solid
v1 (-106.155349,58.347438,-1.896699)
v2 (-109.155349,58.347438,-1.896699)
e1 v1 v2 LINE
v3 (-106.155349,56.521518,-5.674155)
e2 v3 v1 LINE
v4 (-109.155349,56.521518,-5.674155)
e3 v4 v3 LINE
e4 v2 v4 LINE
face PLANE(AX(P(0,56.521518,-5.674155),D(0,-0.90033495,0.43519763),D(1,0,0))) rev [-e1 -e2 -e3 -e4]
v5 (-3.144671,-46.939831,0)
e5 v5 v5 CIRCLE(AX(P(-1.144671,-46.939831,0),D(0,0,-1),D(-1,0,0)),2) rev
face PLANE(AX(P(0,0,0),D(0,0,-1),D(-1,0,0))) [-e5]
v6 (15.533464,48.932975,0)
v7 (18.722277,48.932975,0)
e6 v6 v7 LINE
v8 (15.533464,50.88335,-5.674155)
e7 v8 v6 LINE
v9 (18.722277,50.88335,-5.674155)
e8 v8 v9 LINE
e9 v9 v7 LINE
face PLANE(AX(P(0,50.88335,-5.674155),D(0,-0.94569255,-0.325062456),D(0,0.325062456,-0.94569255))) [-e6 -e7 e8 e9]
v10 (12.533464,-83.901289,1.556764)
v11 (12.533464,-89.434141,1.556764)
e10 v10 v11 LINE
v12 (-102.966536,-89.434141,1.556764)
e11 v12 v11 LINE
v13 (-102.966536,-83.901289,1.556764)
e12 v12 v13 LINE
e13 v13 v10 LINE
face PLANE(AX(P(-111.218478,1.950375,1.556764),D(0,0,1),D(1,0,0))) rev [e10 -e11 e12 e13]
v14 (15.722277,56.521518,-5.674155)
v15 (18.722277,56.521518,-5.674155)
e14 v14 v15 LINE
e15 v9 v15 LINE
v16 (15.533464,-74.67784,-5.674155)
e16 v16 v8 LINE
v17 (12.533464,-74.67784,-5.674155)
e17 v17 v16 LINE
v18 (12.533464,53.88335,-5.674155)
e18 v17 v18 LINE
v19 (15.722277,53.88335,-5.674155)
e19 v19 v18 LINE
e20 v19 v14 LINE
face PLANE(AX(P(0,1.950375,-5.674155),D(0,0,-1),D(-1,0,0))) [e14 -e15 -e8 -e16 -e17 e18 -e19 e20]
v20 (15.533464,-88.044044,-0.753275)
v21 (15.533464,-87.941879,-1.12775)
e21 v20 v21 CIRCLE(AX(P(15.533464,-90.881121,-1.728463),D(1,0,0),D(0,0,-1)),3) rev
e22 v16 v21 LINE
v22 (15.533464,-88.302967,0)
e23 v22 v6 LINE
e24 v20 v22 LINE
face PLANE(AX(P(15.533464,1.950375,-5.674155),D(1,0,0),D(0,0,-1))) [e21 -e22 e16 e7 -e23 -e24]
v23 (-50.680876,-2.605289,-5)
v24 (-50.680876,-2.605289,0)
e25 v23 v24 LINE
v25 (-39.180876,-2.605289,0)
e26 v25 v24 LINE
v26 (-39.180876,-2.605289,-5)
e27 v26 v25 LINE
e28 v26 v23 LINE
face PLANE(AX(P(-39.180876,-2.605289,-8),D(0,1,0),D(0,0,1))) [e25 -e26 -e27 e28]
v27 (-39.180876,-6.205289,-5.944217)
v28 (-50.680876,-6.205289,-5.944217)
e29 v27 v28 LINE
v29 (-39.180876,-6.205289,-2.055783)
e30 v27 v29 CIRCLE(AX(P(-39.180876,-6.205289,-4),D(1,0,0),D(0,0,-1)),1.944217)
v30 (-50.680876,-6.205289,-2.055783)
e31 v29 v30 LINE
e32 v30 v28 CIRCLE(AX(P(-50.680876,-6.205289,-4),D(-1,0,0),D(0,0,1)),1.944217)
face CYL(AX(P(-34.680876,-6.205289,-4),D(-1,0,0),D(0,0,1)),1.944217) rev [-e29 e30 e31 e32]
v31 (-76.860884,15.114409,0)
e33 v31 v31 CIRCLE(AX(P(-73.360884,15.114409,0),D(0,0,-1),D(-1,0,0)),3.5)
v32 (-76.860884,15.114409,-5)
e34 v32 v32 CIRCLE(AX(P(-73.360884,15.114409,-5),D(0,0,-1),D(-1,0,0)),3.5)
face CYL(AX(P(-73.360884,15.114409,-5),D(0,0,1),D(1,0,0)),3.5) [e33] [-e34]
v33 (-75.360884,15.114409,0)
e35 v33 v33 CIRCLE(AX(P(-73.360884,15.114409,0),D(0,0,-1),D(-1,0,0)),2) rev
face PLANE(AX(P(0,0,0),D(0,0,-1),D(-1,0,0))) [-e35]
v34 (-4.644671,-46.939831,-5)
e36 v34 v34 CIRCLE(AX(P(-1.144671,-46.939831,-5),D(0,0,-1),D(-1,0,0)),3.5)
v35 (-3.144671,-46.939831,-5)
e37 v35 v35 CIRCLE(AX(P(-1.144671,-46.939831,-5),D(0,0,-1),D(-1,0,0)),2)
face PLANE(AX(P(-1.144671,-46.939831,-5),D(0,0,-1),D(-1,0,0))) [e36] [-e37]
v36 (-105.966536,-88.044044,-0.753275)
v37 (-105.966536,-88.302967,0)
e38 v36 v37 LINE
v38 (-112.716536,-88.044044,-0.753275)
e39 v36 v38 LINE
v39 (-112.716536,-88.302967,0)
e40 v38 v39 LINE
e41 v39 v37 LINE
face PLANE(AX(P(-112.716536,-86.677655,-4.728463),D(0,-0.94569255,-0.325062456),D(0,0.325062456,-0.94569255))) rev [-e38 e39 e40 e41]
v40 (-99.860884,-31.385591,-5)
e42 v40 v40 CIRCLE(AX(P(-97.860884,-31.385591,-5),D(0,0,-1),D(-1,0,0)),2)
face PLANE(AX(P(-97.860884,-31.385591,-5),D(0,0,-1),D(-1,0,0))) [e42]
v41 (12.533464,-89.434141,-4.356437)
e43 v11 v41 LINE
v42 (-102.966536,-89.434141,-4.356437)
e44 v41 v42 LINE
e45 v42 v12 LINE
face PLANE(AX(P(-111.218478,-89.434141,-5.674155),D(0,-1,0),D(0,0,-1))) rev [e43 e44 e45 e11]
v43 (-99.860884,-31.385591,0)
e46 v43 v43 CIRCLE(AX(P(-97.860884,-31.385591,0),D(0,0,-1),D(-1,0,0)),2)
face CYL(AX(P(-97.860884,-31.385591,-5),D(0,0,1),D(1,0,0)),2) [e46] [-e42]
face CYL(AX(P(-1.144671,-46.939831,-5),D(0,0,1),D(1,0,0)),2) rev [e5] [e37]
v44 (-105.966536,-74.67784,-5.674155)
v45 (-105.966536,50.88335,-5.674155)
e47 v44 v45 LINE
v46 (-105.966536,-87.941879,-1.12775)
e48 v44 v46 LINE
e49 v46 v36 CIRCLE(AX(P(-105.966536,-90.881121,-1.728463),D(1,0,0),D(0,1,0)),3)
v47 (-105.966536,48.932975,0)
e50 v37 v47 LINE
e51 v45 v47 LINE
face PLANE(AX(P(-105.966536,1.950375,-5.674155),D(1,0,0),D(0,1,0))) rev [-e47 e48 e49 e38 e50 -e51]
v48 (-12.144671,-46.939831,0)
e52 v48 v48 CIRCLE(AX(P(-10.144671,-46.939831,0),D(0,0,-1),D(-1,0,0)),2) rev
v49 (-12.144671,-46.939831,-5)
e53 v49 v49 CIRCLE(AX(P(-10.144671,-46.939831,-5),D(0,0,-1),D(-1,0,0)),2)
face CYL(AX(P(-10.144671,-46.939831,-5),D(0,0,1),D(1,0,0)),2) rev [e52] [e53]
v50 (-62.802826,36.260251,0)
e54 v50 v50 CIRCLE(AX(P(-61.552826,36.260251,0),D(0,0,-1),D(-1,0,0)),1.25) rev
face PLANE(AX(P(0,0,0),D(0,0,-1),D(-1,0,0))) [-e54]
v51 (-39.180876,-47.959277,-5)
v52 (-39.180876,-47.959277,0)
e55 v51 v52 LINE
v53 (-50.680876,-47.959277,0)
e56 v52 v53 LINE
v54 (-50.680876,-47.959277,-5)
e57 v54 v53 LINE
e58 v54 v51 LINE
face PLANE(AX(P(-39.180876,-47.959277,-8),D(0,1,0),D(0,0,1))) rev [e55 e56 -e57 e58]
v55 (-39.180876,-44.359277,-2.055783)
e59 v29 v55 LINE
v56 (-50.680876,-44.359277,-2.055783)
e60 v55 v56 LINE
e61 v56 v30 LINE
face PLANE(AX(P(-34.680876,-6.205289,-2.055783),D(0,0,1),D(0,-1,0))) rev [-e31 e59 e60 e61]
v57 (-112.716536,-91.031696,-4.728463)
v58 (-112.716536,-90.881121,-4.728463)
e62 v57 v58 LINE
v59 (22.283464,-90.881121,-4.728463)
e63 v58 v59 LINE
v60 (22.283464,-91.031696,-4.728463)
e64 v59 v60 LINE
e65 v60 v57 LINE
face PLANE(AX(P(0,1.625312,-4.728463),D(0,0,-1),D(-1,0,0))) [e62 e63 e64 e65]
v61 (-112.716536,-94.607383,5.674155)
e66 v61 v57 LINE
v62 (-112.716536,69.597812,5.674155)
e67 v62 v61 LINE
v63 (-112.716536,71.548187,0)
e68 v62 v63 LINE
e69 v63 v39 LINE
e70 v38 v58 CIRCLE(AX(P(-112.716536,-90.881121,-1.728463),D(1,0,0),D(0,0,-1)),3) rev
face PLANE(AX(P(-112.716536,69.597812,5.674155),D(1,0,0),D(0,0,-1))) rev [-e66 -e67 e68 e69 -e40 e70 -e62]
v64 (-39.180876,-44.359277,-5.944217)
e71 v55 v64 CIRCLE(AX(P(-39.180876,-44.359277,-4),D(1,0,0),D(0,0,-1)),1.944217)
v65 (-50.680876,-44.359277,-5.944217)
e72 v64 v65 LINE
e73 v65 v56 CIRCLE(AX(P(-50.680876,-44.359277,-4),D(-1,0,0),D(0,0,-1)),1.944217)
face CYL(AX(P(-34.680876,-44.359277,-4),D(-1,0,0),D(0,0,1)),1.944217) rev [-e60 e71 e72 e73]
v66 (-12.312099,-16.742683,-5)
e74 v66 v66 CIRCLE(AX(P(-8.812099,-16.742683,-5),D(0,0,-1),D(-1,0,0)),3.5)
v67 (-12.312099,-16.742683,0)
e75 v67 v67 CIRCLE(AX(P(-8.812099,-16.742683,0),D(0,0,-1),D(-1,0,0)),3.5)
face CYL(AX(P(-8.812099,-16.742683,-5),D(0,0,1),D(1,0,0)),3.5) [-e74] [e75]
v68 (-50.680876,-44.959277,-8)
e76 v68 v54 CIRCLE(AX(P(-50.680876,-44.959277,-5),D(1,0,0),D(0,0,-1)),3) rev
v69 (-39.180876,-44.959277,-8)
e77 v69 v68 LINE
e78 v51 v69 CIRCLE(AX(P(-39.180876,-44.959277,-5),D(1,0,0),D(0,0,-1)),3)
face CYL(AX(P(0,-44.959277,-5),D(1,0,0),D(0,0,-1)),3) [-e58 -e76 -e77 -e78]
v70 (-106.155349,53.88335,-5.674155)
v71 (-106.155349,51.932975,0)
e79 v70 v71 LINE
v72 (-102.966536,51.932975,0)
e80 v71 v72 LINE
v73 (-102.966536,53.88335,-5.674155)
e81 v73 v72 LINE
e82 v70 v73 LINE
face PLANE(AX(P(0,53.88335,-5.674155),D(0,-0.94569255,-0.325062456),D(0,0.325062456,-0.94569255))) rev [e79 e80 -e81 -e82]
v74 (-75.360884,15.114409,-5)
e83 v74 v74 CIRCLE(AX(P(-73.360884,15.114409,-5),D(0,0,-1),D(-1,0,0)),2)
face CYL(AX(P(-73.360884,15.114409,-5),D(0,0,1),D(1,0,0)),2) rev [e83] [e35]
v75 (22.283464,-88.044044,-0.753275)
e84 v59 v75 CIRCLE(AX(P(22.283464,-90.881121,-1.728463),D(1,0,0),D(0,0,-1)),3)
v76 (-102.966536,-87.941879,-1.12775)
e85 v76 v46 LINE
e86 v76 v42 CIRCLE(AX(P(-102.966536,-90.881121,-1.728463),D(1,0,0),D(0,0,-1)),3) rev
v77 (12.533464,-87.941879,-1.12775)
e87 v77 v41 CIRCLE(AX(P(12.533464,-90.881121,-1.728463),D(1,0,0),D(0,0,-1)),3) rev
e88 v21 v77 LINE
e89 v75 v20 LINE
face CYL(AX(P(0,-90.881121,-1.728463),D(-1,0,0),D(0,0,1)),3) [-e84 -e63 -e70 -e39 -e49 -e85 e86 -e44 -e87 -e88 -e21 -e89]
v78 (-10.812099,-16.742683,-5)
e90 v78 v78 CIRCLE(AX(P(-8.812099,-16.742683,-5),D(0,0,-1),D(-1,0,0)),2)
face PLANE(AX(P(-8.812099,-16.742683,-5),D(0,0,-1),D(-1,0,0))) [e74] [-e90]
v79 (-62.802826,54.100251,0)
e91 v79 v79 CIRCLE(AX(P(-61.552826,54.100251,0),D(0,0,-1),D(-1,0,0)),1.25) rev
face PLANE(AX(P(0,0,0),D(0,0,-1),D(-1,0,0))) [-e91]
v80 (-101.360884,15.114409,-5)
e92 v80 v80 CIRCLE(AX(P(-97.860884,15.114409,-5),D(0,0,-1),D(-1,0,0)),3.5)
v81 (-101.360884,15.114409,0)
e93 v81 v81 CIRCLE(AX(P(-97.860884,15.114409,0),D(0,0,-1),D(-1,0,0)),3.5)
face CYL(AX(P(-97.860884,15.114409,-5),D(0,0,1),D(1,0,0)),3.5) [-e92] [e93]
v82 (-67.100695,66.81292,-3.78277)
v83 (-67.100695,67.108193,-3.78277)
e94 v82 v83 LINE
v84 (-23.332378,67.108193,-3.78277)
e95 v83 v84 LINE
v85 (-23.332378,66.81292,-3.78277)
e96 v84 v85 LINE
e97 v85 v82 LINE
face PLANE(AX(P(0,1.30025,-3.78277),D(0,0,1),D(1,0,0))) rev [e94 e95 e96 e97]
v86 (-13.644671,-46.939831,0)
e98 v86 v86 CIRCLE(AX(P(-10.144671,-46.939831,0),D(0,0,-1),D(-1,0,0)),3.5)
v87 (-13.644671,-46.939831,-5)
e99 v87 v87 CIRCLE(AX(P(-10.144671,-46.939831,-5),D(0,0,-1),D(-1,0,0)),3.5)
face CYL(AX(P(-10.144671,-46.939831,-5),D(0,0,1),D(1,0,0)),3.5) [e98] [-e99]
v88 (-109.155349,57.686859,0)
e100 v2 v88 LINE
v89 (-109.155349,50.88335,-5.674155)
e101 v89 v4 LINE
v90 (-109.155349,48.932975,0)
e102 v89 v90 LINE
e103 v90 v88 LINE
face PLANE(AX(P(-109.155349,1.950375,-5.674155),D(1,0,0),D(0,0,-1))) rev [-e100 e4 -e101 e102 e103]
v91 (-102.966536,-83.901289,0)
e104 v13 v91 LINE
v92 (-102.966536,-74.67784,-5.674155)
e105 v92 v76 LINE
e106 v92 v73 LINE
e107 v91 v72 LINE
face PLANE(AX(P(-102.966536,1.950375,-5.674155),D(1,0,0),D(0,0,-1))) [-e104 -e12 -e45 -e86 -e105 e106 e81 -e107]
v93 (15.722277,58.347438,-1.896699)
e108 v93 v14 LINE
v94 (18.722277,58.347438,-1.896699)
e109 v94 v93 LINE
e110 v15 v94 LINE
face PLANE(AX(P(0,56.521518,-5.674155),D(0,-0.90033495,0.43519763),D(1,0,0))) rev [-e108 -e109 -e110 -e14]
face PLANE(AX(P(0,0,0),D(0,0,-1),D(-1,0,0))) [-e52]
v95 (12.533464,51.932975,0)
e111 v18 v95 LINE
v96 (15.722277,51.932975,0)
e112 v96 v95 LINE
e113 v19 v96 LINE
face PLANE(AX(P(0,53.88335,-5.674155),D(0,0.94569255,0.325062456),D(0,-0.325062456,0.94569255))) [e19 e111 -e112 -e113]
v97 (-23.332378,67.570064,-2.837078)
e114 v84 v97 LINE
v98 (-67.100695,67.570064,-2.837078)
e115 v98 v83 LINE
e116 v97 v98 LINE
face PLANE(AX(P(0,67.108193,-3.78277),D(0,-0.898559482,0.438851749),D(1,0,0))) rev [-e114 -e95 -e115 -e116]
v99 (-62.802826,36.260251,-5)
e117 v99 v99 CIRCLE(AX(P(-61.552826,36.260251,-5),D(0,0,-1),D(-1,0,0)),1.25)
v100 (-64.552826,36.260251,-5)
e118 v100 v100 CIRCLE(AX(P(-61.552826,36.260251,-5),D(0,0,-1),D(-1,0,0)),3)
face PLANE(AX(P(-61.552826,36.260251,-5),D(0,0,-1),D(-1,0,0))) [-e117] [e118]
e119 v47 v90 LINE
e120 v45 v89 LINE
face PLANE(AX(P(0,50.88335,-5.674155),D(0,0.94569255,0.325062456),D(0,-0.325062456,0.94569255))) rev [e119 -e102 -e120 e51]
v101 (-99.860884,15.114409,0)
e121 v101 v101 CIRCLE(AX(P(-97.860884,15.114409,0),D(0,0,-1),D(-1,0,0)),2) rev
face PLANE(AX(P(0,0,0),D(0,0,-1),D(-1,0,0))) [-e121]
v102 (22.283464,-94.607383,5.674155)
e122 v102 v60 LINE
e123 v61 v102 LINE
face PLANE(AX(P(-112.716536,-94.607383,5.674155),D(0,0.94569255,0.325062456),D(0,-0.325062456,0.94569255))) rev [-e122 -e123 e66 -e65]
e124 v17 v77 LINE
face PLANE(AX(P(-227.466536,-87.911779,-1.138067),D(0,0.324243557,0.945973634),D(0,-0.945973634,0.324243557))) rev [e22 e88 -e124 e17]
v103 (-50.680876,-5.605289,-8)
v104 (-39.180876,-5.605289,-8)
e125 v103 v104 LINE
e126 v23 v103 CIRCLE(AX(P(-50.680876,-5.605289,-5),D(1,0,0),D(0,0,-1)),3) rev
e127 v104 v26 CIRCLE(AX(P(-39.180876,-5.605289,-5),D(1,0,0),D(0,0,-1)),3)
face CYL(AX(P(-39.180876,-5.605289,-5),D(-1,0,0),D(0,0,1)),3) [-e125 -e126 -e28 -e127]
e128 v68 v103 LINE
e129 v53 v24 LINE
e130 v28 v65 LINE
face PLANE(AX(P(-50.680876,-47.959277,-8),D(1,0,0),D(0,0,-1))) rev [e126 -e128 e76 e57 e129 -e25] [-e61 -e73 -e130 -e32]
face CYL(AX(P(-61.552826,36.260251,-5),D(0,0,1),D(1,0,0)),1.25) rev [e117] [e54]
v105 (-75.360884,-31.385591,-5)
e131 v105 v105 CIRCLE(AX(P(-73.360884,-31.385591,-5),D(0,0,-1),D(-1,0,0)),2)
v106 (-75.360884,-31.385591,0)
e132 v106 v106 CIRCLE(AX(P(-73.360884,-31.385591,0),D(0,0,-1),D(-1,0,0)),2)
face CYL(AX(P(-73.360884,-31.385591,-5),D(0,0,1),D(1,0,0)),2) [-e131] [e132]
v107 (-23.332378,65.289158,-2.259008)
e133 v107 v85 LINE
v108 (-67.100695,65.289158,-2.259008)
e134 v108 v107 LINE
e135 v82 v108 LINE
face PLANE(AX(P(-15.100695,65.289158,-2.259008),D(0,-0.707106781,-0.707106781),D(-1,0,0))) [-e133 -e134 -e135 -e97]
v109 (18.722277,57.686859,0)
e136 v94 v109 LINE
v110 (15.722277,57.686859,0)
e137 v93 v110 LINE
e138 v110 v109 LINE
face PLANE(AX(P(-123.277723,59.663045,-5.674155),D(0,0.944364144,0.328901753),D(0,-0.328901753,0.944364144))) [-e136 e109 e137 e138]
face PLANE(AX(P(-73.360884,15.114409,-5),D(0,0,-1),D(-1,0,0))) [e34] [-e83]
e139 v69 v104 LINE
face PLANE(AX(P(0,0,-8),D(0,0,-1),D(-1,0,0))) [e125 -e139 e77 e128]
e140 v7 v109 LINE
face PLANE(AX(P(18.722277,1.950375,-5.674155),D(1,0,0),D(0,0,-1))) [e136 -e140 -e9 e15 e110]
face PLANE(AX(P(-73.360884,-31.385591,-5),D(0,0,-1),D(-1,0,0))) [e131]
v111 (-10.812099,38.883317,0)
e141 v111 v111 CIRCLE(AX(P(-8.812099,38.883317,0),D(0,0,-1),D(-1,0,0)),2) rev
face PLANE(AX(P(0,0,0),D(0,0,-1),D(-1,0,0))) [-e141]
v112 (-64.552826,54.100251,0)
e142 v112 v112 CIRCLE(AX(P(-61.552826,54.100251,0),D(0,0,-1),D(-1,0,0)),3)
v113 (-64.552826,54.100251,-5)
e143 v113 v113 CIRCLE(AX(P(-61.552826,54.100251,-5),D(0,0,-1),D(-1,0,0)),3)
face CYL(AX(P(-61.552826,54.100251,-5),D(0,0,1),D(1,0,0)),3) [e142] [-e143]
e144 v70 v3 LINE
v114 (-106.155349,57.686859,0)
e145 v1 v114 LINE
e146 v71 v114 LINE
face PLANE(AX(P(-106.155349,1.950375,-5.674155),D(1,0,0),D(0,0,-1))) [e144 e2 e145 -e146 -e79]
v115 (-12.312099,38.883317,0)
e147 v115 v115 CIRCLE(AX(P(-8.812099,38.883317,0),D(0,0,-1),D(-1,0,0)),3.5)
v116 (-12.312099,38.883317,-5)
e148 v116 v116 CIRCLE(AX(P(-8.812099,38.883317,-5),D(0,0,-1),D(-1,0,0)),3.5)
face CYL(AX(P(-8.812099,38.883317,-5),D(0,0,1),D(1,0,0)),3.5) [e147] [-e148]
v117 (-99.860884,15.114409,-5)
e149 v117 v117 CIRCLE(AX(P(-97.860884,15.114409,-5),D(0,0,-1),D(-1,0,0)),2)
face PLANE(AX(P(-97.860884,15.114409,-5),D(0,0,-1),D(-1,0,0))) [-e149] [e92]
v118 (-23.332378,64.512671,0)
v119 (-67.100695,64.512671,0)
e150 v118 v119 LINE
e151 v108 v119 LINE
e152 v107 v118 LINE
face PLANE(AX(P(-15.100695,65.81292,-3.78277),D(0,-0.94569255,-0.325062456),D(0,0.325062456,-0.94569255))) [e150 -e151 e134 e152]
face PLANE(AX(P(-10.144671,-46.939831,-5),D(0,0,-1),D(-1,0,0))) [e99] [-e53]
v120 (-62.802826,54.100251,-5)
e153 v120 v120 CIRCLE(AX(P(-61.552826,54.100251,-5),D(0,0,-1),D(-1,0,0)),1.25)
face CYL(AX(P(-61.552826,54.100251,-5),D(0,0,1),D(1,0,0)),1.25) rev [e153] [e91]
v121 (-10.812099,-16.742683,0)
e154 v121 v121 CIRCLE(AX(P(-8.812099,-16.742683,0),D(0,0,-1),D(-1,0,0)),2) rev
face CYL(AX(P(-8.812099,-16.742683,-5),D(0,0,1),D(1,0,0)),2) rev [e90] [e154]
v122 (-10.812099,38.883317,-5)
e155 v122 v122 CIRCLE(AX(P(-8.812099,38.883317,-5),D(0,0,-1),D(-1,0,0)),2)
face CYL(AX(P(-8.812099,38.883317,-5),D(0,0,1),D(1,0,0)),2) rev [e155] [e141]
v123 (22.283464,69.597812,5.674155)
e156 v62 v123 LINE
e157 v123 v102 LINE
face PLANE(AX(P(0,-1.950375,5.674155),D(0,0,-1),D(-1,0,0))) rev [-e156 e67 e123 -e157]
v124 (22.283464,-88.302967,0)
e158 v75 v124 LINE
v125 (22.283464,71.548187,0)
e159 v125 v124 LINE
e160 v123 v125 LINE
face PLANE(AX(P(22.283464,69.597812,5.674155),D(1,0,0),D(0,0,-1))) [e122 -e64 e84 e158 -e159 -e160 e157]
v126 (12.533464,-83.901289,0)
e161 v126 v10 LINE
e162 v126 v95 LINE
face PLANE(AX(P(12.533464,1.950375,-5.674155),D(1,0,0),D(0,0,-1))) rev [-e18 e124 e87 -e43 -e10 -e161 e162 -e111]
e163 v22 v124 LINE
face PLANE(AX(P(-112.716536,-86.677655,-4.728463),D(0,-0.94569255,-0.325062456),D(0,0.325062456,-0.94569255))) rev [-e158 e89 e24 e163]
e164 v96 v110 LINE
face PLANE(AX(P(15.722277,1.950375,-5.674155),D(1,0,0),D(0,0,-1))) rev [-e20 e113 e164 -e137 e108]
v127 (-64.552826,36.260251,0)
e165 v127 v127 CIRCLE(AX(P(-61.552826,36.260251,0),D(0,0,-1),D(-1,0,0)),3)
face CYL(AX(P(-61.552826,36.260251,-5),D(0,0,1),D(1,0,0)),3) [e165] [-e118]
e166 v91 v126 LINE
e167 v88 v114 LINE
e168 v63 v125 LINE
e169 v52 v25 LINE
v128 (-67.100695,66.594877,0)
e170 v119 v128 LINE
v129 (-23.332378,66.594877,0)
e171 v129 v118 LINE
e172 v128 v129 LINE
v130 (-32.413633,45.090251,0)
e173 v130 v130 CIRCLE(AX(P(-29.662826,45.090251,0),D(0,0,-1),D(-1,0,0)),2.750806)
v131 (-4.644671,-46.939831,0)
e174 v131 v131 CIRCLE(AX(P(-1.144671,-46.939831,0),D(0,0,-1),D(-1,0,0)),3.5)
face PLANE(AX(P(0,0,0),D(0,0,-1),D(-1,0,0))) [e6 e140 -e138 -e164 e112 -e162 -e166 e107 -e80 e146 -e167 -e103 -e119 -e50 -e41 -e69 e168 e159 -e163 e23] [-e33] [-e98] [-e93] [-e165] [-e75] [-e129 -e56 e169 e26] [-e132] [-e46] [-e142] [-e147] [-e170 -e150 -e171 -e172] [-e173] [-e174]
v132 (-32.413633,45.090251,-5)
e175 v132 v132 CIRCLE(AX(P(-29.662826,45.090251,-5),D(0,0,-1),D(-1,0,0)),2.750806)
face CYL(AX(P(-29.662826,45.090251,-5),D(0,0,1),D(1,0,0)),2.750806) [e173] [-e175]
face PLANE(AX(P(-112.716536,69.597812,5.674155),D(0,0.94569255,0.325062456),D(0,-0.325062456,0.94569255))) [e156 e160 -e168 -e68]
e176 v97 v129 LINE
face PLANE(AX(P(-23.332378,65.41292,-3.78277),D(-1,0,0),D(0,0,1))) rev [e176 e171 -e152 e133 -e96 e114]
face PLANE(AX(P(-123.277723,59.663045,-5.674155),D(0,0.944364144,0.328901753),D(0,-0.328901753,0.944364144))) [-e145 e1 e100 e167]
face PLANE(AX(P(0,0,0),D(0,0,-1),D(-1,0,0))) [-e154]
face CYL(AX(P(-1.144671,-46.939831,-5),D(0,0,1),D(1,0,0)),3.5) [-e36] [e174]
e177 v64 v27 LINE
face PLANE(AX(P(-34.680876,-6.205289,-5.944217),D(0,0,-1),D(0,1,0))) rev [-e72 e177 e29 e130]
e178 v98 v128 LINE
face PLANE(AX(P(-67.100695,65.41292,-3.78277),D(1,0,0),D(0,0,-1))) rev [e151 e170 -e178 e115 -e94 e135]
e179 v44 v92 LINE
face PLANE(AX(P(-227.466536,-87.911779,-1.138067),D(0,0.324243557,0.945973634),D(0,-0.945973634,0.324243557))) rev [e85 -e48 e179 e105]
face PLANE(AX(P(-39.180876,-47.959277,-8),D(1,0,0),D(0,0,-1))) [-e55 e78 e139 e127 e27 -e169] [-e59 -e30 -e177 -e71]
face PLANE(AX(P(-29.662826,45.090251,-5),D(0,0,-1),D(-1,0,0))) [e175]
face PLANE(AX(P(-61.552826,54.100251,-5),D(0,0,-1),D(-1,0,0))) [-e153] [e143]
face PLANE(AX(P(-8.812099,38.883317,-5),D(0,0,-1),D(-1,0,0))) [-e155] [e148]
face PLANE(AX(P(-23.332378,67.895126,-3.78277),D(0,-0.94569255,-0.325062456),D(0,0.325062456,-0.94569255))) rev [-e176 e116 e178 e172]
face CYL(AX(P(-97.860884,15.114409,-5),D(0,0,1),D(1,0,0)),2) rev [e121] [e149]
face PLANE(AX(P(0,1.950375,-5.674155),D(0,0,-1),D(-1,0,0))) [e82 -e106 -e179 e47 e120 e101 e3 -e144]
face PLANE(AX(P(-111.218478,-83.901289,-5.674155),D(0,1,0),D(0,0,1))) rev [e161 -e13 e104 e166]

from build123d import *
from OCP.BRepFilletAPI import BRepFilletAPI_MakeChamfer

# Parameters (mm, degrees)
SALIENTE_EXTRUIR1_START   = -112.716536218
SALIENTE_EXTRUIR1_DEPTH   = 135
SALIENTE_EXTRUIR2_START   = -105.966536218
SALIENTE_EXTRUIR2_DEPTH   = 3
SALIENTE_EXTRUIR2_START_2 = 12.533463782
SALIENTE_EXTRUIR2_2_DEPTH = 3
SALIENTE_EXTRUIR2_START_3 = -102.966536218
SALIENTE_EXTRUIR2_3_DEPTH = 115.5
SALIENTE_EXTRUIR2_START_4 = -109.155348963
SALIENTE_EXTRUIR2_4_DEPTH = 3
SALIENTE_EXTRUIR2_START_5 = 15.722276527
SALIENTE_EXTRUIR2_5_DEPTH = 3
SALIENTE_EXTRUIR2_START_6 = -106.155348963
SALIENTE_EXTRUIR2_6_DEPTH = 0.188812745
SALIENTE_EXTRUIR2_START_7 = 15.533463782
SALIENTE_EXTRUIR2_7_DEPTH = 0.188812745
CORTAR_EXTRUIR1_DEPTH     = 142
SALIENTE_EXTRUIR3_START   = -67.100694653
SALIENTE_EXTRUIR3_DEPTH   = 43.76831687
CORTAR_EXTRUIR2_DEPTH     = 52
CHAFL_N1_SIZE             = 1
CHAFL_N1_SIZE2            = 0.786933748
CHAFL_N2_SIZE             = 1
CHAFL_N2_SIZE2            = 1.611265726
CHAFL_N3_SIZE             = 4
CHAFL_N3_SIZE2            = 3.141527632
CORTAR_EXTRUIR3_DEPTH     = 243
CHAFL_N4_SIZE             = 2
CHAFL_N4_SIZE2            = 1.425175398
CROQUIS7_W                = 135
CROQUIS7_H                = 4.35404101
SALIENTE_EXTRUIR4_DEPTH   = 5
REDONDEO1_R               = 3
SALIENTE_EXTRUIR5_DEPTH   = 8
CORTAR_EXTRUIR4_DEPTH     = 16
REDONDEO2_R               = 3
CORTAR_EXTRUIR5_START     = -9.75
CORTAR_EXTRUIR5_DEPTH     = 115.5
CROQUIS11_R               = 3.5
CROQUIS11_R_2             = 2
CROQUIS11_R_3             = 3
CROQUIS11_R_4             = 1.25
CROQUIS11_R_5             = 2.750806456
SALIENTE_EXTRUIR6_DEPTH   = 5


# Read off the part's stored shape, not the designer's step: Saliente-Extruir1, Saliente-Extruir2, Saliente-Extruir3
with BuildPart() as part:
    # Saliente-Extruir1 outline → Saliente-Extruir1 (new body)
    with BuildSketch(Plane.YZ.offset(SALIENTE_EXTRUIR1_START)):
        Polygon((-94.607382532, 5.674155302), (-92.657007797, 0), (71.548186707, 0), (69.597811972, 5.674155302), align=None)
    extrude(amount=SALIENTE_EXTRUIR1_DEPTH)

    # Saliente-Extruir2 outline → Saliente-Extruir2 (add)
    with BuildSketch(Plane.YZ.offset(SALIENTE_EXTRUIR2_START)):
        Polygon((-88.302966787, 0), (-86.352592053, -5.674155302), (53.883350011, -5.674155302), (51.932975277, 0), align=None)
    extrude(amount=SALIENTE_EXTRUIR2_DEPTH)

    # Saliente-Extruir2 2 outline → Saliente-Extruir2 2 (add)
    with BuildSketch(Plane.YZ.offset(SALIENTE_EXTRUIR2_START_2)):
        Polygon((-88.302966787, 0), (-86.352592053, -5.674155302), (53.883350011, -5.674155302), (51.932975277, 0), align=None)
    extrude(amount=SALIENTE_EXTRUIR2_2_DEPTH)

    # Saliente-Extruir2 3 outline → Saliente-Extruir2 3 (add)
    with BuildSketch(Plane.YZ.offset(SALIENTE_EXTRUIR2_START_3)):
        Polygon((-85.302966787, 0), (-88.302966787, 0), (-86.352592053, -5.674155302), (-83.352592053, -5.674155302), align=None)
    extrude(amount=SALIENTE_EXTRUIR2_3_DEPTH)

    # Saliente-Extruir2 4 outline → Saliente-Extruir2 4 (add)
    with BuildSketch(Plane.YZ.offset(SALIENTE_EXTRUIR2_START_4)):
        Polygon((48.932975277, 0), (50.883350011, -5.674155302), (63.313045378, -5.674155302), (61.362670643, 0), align=None)
    extrude(amount=SALIENTE_EXTRUIR2_4_DEPTH)

    # Saliente-Extruir2 5 outline → Saliente-Extruir2 5 (add)
    with BuildSketch(Plane.YZ.offset(SALIENTE_EXTRUIR2_START_5)):
        Polygon((48.932975277, 0), (50.883350011, -5.674155302), (63.313045378, -5.674155302), (61.362670643, 0), align=None)
    extrude(amount=SALIENTE_EXTRUIR2_5_DEPTH)

    # Saliente-Extruir2 6 outline → Saliente-Extruir2 6 (add)
    with BuildSketch(Plane.YZ.offset(SALIENTE_EXTRUIR2_START_6)):
        Polygon((51.932975277, 0), (48.932975277, 0), (50.883350011, -5.674155302), (53.883350011, -5.674155302), align=None)
    extrude(amount=SALIENTE_EXTRUIR2_6_DEPTH)

    # Saliente-Extruir2 7 outline → Saliente-Extruir2 7 (add)
    with BuildSketch(Plane.YZ.offset(SALIENTE_EXTRUIR2_START_7)):
        Polygon((51.932975277, 0), (48.932975277, 0), (50.883350011, -5.674155302), (53.883350011, -5.674155302), align=None)
    extrude(amount=SALIENTE_EXTRUIR2_7_DEPTH)

    # Croquis3 → Cortar-Extruir1 (cut)
    with BuildSketch(Plane(origin=(18.722276527, 0, 0), x_dir=(0, 0, -1), z_dir=(1, 0, 0))):
        Polygon((5.674155302, 59.663045378), (0, 57.686858925), (0, 61.691536691), (6.106990738, 63.936404196), (5.897646794, 59.689197808), align=None)
    extrude(amount=-CORTAR_EXTRUIR1_DEPTH, mode=Mode.SUBTRACT)

    # Saliente-Extruir3 outline → Saliente-Extruir3 (add)
    with BuildSketch(Plane.YZ.offset(SALIENTE_EXTRUIR3_START)):
        Polygon((67.89512648, -3.782770202), (66.594876657, 0), (64.112670643, 0), (65.412920466, -3.782770202), align=None)
    extrude(amount=SALIENTE_EXTRUIR3_DEPTH)

    # Croquis5 → Cortar-Extruir2 (cut)
    with BuildSketch(Plane.ZY.offset(67.100694653)):
        Polygon((0, 64.112670643), (-3.782770202, 65.412920466), (-3.782770202, 65.812920466), (0, 64.512670643), align=None)
    extrude(amount=-CORTAR_EXTRUIR2_DEPTH, mode=Mode.SUBTRACT)

    # Chaflán1
    chafl_n1_edges = [part.edges().sort_by_distance(p)[0] for p in [
        (-45.216536218, 67.89512648, -3.782770202),
    ]]
    chafl_n1_side = [part.faces().sort_by_distance(p)[0] for p in [
        (-45.216536218, 67.245001569, -1.891385101),
    ]]
    chamfer(chafl_n1_edges, length=CHAFL_N1_SIZE, length2=CHAFL_N1_SIZE2, reference=chafl_n1_side[0])

    # Chaflán2
    chafl_n2_edges = [part.edges().sort_by_distance(p)[0] for p in [
        (-45.216536218, 65.812920466, -3.782770202),
    ]]
    chafl_n2_side = [part.faces().sort_by_distance(p)[0] for p in [
        (-45.216536218, 66.460556599, -3.782770202),
    ]]
    chamfer(chafl_n2_edges, length=CHAFL_N2_SIZE, length2=CHAFL_N2_SIZE2, reference=chafl_n2_side[0])

    # Chaflán3: one chamfer whose edges measure the first distance from different faces: ONE call of the kernel's chamfer builder (chamfer() names one face for all edges)
    chafl_n3_edges_1 = [part.edges().sort_by_distance(p)[0] for p in [
        (17.222276527, 59.663045378, -5.674155302),
    ]]
    chafl_n3_side_1 = [part.faces().sort_by_distance(p)[0] for p in [
        (17.222276527, 58.674952151, -2.837077651),
    ]]
    chafl_n3_edges_2 = [part.edges().sort_by_distance(p)[0] for p in [
        (-107.655348963, 59.663045378, -5.674155302),
    ]]
    chafl_n3_side_2 = [part.faces().sort_by_distance(p)[0] for p in [
        (-107.655348963, 58.674952151, -2.837077651),
    ]]
    chafl_n3 = BRepFilletAPI_MakeChamfer(part.part.solid().wrapped)
    for e in chafl_n3_edges_1:
        chafl_n3.Add(CHAFL_N3_SIZE, CHAFL_N3_SIZE2, e.wrapped, chafl_n3_side_1[0].wrapped)  # the first distance lies on this face
    for e in chafl_n3_edges_2:
        chafl_n3.Add(CHAFL_N3_SIZE, CHAFL_N3_SIZE2, e.wrapped, chafl_n3_side_2[0].wrapped)  # the first distance lies on this face
    add(Compound.cast(chafl_n3.Shape()), mode=Mode.REPLACE)

    # Croquis6 → Cortar-Extruir3 (cut)
    with BuildSketch(Plane(origin=(15.533463782, 0, 0), x_dir=(0, 0, -1), z_dir=(1, 0, 0))):
        Polygon((1.138067307, -87.911779447), (5.674155302, -74.677839868), (7.462563926, -80.875468684), (5.674155302, -88.836341828), (1.028411824, -88.836341828), align=None)
    extrude(amount=-CORTAR_EXTRUIR3_DEPTH, mode=Mode.SUBTRACT)

    # Chaflán4
    chafl_n4_edges = [part.edges().sort_by_distance(p)[0] for p in [
        (-45.216536218, -84.511123218, -2.303682112),
    ]]
    chafl_n4_side = [part.faces().sort_by_distance(p)[0] for p in [
        (-45.216536218, -85.384648624, -2.004271034),
    ]]
    chamfer(chafl_n4_edges, length=CHAFL_N4_SIZE, length2=CHAFL_N4_SIZE2, reference=chafl_n4_side[0])

    # Croquis7 → Saliente-Extruir4 (add, along a direction that is not the sketch's normal)
    with BuildSketch(Plane(origin=(0, 0, 0), x_dir=(-1, 0, 0), z_dir=(0, 0, -1))):
        with Locations((45.216536218, -90.479987292)):
            Rectangle(CROQUIS7_W, CROQUIS7_H)
    extrude(amount=SALIENTE_EXTRUIR4_DEPTH, dir=(0, 0.3250624557733218, -0.9456925503812629))

    # Redondeo1
    # the kernel refuses this fillet: 3 mm, written as the material it takes off along each edge
    with BuildSketch(Plane(origin=(32.792131123, -86.677654508, -4.728462752), x_dir=(0, -0.325062455773321, 0.945692550381263), z_dir=(-1, 0, 0))) as redondeo1_piece_1_section:
        with BuildLine():
            CenterArc((REDONDEO1_R * 1.40115564539, -REDONDEO1_R), REDONDEO1_R, 90, 108.969358895)
            Line((REDONDEO1_R * 0.455463095012, -REDONDEO1_R * 1.32506245577), (0, 0))
            Line((0, 0), (REDONDEO1_R * 1.40115564539, 0))
        make_face()
    redondeo1_piece_1 = extrude(amount=156.017334681, mode=Mode.PRIVATE)
    redondeo1_piece_1 = split(redondeo1_piece_1, bisect_by=Plane(origin=(24.162797452, -87.99794968, -1.108531449), z_dir=(0, 0.3242435571173952, 0.945973633706489)), keep=Keep.TOP, mode=Mode.PRIVATE)
    redondeo1_piece_1 = split(redondeo1_piece_1, bisect_by=Plane(origin=(15.533463782, -87.946261659, -0.957732753), z_dir=(1, 0, 0)), keep=Keep.TOP, mode=Mode.PRIVATE)
    add(redondeo1_piece_1, mode=Mode.SUBTRACT)
    with BuildSketch(Plane(origin=(32.792131123, -86.677654508, -4.728462752), x_dir=(0, -0.325062455773321, 0.945692550381263), z_dir=(-1, 0, 0))) as redondeo1_piece_2_section:
        with BuildLine():
            CenterArc((REDONDEO1_R * 1.40115564539, -REDONDEO1_R), REDONDEO1_R, 90, 108.969358895)
            Line((REDONDEO1_R * 0.455463095012, -REDONDEO1_R * 1.32506245577), (0, 0))
            Line((0, 0), (REDONDEO1_R * 1.40115564539, 0))
        make_face()
    redondeo1_piece_2 = extrude(amount=156.017334681, mode=Mode.PRIVATE)
    redondeo1_piece_2 = split(redondeo1_piece_2, bisect_by=Plane(origin=(24.162797452, -87.17098593, -1.391982973), z_dir=(0, -0.3242435571173952, -0.945973633706489)), keep=Keep.TOP, mode=Mode.PRIVATE)
    redondeo1_piece_2 = split(redondeo1_piece_2, bisect_by=Plane(origin=(15.533463782, -87.997966874, -3.804682167), z_dir=(1, 0, 0)), keep=Keep.TOP, mode=Mode.PRIVATE)
    add(redondeo1_piece_2, mode=Mode.SUBTRACT)
    with BuildSketch(Plane(origin=(32.792131123, -86.677654508, -4.728462752), x_dir=(0, -0.325062455773321, 0.945692550381263), z_dir=(-1, 0, 0))) as redondeo1_piece_3_section:
        with BuildLine():
            CenterArc((REDONDEO1_R * 1.40115564539, -REDONDEO1_R), REDONDEO1_R, 90, 108.969358895)
            Line((REDONDEO1_R * 0.455463095012, -REDONDEO1_R * 1.32506245577), (0, 0))
            Line((0, 0), (REDONDEO1_R * 1.40115564539, 0))
        make_face()
    redondeo1_piece_3 = extrude(amount=156.017334681, mode=Mode.PRIVATE)
    redondeo1_piece_3 = split(redondeo1_piece_3, bisect_by=Plane(origin=(-45.216536218, -87.17098593, -1.391982973), z_dir=(0, -0.3242435571173952, -0.945973633706489)), keep=Keep.TOP, mode=Mode.PRIVATE)
    redondeo1_piece_3 = split(redondeo1_piece_3, bisect_by=Plane(origin=(15.533463782, -87.997966874, -3.804682167), z_dir=(-1, 0, 0)), keep=Keep.TOP, mode=Mode.PRIVATE)
    redondeo1_piece_3 = split(redondeo1_piece_3, bisect_by=Plane(origin=(-105.966536218, -87.997966874, -3.804682167), z_dir=(1, 0, 0)), keep=Keep.TOP, mode=Mode.PRIVATE)
    add(redondeo1_piece_3, mode=Mode.SUBTRACT)
    with BuildSketch(Plane(origin=(32.792131123, -86.677654508, -4.728462752), x_dir=(0, -0.325062455773321, 0.945692550381263), z_dir=(-1, 0, 0))) as redondeo1_piece_4_section:
        with BuildLine():
            CenterArc((REDONDEO1_R * 1.40115564539, -REDONDEO1_R), REDONDEO1_R, 90, 108.969358895)
            Line((REDONDEO1_R * 0.455463095012, -REDONDEO1_R * 1.32506245577), (0, 0))
            Line((0, 0), (REDONDEO1_R * 1.40115564539, 0))
        make_face()
    redondeo1_piece_4 = extrude(amount=156.017334681, mode=Mode.PRIVATE)
    redondeo1_piece_4 = split(redondeo1_piece_4, bisect_by=Plane(origin=(-114.595869888, -87.99794968, -1.108531449), z_dir=(0, 0.3242435571173952, 0.945973633706489)), keep=Keep.TOP, mode=Mode.PRIVATE)
    redondeo1_piece_4 = split(redondeo1_piece_4, bisect_by=Plane(origin=(-105.966536218, -87.946261659, -0.957732753), z_dir=(-1, 0, 0)), keep=Keep.TOP, mode=Mode.PRIVATE)
    add(redondeo1_piece_4, mode=Mode.SUBTRACT)
    with BuildSketch(Plane(origin=(32.792131123, -86.677654508, -4.728462752), x_dir=(0, -0.325062455773321, 0.945692550381263), z_dir=(-1, 0, 0))) as redondeo1_piece_5_section:
        with BuildLine():
            CenterArc((REDONDEO1_R * 1.40115564539, -REDONDEO1_R), REDONDEO1_R, 90, 108.969358895)
            Line((REDONDEO1_R * 0.455463095012, -REDONDEO1_R * 1.32506245577), (0, 0))
            Line((0, 0), (REDONDEO1_R * 1.40115564539, 0))
        make_face()
    redondeo1_piece_5 = extrude(amount=156.017334681, mode=Mode.PRIVATE)
    redondeo1_piece_5 = split(redondeo1_piece_5, bisect_by=Plane(origin=(-114.595869888, -87.17098593, -1.391982973), z_dir=(0, -0.3242435571173952, -0.945973633706489)), keep=Keep.TOP, mode=Mode.PRIVATE)
    redondeo1_piece_5 = split(redondeo1_piece_5, bisect_by=Plane(origin=(-105.966536218, -87.997966874, -3.804682167), z_dir=(-1, 0, 0)), keep=Keep.TOP, mode=Mode.PRIVATE)
    add(redondeo1_piece_5, mode=Mode.SUBTRACT)

    # Croquis8 → Saliente-Extruir5 (add)
    with BuildSketch(Plane(origin=(0, 0, 0), x_dir=(-1, 0, 0), z_dir=(0, 0, -1))):
        Polygon((39.180876317, -2.605289364), (39.180876317, -47.959276742), (50.680876317, -47.959276742), (50.680876317, -2.605289364), (44.930876317, -2.605289364), align=None)
    extrude(amount=SALIENTE_EXTRUIR5_DEPTH)

    # Croquis9 → Cortar-Extruir4 (cut)
    with BuildSketch(Plane.ZY.offset(50.680876317)):
        with BuildLine():
            Line((-5.944216718, -6.205289364), (-5.944216718, -44.359276742))
            ThreePointArc((-5.944216718, -44.359276742), (-4, -46.30349346), (-2.055783282, -44.359276742))
            Line((-2.055783282, -44.359276742), (-2.055783282, -6.205289364))
            ThreePointArc((-2.055783282, -6.205289364), (-4, -4.261072646), (-5.944216718, -6.205289364))
        make_face()
    extrude(amount=-CORTAR_EXTRUIR4_DEPTH, mode=Mode.SUBTRACT)

    # Redondeo2
    redondeo2_edges = [part.edges().sort_by_distance(p)[0] for p in [
        (-44.930876317, -2.605289364, -8),
        (-44.930876317, -47.959276742, -8),
    ]]
    fillet(redondeo2_edges, radius=REDONDEO2_R)

    # Croquis10 → Cortar-Extruir5 (cut)
    with BuildSketch(Plane(origin=(22.283463782, 0, 0), x_dir=(0, 0, -1), z_dir=(1, 0, 0)).offset(CORTAR_EXTRUIR5_START)):
        with BuildLine():
            Line((0, -88.302966787), (0, -83.901289326))
            Line((0, -83.901289326), (-1.556763584, -83.901289326))
            Line((-1.556763584, -83.901289326), (-1.556763584, -89.434140922))
            Line((-1.556763584, -89.434140922), (4.356436756, -89.434140922))
            ThreePointArc((4.356436756, -89.434140922), (2.808286082, -88.082196369), (0.753275385, -88.044043793))
            Line((0.753275385, -88.044043793), (0, -88.302966787))
        make_face()
        with BuildLine():
            Line((1.333248246, -84.585765812), (0, -83.901289326))
            Line((0, -83.901289326), (0, -88.302966787))
            Line((0, -88.302966787), (0.753275385, -88.044043793))
            ThreePointArc((0.753275385, -88.044043793), (2.808286082, -88.082196369), (4.356436756, -89.434140922))
            Line((4.356436756, -89.434140922), (4.565498319, -89.434140922))
            Line((4.565498319, -89.434140922), (1.333248246, -84.585765812))
        make_face()
    extrude(amount=-CORTAR_EXTRUIR5_DEPTH, mode=Mode.SUBTRACT)

    # Croquis11 → Saliente-Extruir6 (add)
    # profile 1 of 11: a face of its own
    with BuildSketch(Plane(origin=(0, 0, 0), x_dir=(-1, 0, 0), z_dir=(0, 0, -1))):
        with Locations((8.812099275, -16.74268297)):
            Circle(CROQUIS11_R)
        with Locations((8.812099275, -16.74268297)):
            Circle(CROQUIS11_R_2, mode=Mode.SUBTRACT)
    # profile 2 of 11: a face of its own
    with BuildSketch(Plane(origin=(0, 0, 0), x_dir=(-1, 0, 0), z_dir=(0, 0, -1))):
        with Locations((8.812099275, 38.88331703)):
            Circle(CROQUIS11_R)
        with Locations((8.812099275, 38.88331703)):
            Circle(CROQUIS11_R_2, mode=Mode.SUBTRACT)
    # profile 3 of 11: a face of its own
    with BuildSketch(Plane(origin=(0, 0, 0), x_dir=(-1, 0, 0), z_dir=(0, 0, -1))):
        with Locations((73.360883811, 15.114409269)):
            Circle(CROQUIS11_R)
        with Locations((73.360883811, 15.114409269)):
            Circle(CROQUIS11_R_2, mode=Mode.SUBTRACT)
    # profile 4 of 11: a face of its own
    with BuildSketch(Plane(origin=(0, 0, 0), x_dir=(-1, 0, 0), z_dir=(0, 0, -1))):
        with Locations((97.860883811, 15.114409269)):
            Circle(CROQUIS11_R)
        with Locations((97.860883811, 15.114409269)):
            Circle(CROQUIS11_R_2, mode=Mode.SUBTRACT)
    # profile 5 of 11: a face of its own
    with BuildSketch(Plane(origin=(0, 0, 0), x_dir=(-1, 0, 0), z_dir=(0, 0, -1))):
        with Locations((73.360883811, -31.385590731)):
            Circle(CROQUIS11_R_2)
    # profile 6 of 11: a face of its own
    with BuildSketch(Plane(origin=(0, 0, 0), x_dir=(-1, 0, 0), z_dir=(0, 0, -1))):
        with Locations((97.860883811, -31.385590731)):
            Circle(CROQUIS11_R_2)
    # profile 7 of 11: a face of its own
    with BuildSketch(Plane(origin=(0, 0, 0), x_dir=(-1, 0, 0), z_dir=(0, 0, -1))):
        with Locations((1.144671317, -46.93983138)):
            Circle(CROQUIS11_R)
        with Locations((1.144671317, -46.93983138)):
            Circle(CROQUIS11_R_2, mode=Mode.SUBTRACT)
    # profile 8 of 11: a face of its own
    with BuildSketch(Plane(origin=(0, 0, 0), x_dir=(-1, 0, 0), z_dir=(0, 0, -1))):
        with Locations((10.144671317, -46.93983138)):
            Circle(CROQUIS11_R)
        with Locations((10.144671317, -46.93983138)):
            Circle(CROQUIS11_R_2, mode=Mode.SUBTRACT)
    # profile 9 of 11: a face of its own
    with BuildSketch(Plane(origin=(0, 0, 0), x_dir=(-1, 0, 0), z_dir=(0, 0, -1))):
        with Locations((61.552826127, 54.100251176)):
            Circle(CROQUIS11_R_3)
        with Locations((61.552826127, 54.100251176)):
            Circle(CROQUIS11_R_4, mode=Mode.SUBTRACT)
    # profile 10 of 11: a face of its own
    with BuildSketch(Plane(origin=(0, 0, 0), x_dir=(-1, 0, 0), z_dir=(0, 0, -1))):
        with Locations((61.552826127, 36.260251176)):
            Circle(CROQUIS11_R_3)
        with Locations((61.552826127, 36.260251176)):
            Circle(CROQUIS11_R_4, mode=Mode.SUBTRACT)
    # profile 11 of 11: a face of its own
    with BuildSketch(Plane(origin=(0, 0, 0), x_dir=(-1, 0, 0), z_dir=(0, 0, -1))):
        with Locations((29.662826127, 45.090251176)):
            Circle(CROQUIS11_R_5)
    extrude(amount=SALIENTE_EXTRUIR6_DEPTH)


solid = part.part
